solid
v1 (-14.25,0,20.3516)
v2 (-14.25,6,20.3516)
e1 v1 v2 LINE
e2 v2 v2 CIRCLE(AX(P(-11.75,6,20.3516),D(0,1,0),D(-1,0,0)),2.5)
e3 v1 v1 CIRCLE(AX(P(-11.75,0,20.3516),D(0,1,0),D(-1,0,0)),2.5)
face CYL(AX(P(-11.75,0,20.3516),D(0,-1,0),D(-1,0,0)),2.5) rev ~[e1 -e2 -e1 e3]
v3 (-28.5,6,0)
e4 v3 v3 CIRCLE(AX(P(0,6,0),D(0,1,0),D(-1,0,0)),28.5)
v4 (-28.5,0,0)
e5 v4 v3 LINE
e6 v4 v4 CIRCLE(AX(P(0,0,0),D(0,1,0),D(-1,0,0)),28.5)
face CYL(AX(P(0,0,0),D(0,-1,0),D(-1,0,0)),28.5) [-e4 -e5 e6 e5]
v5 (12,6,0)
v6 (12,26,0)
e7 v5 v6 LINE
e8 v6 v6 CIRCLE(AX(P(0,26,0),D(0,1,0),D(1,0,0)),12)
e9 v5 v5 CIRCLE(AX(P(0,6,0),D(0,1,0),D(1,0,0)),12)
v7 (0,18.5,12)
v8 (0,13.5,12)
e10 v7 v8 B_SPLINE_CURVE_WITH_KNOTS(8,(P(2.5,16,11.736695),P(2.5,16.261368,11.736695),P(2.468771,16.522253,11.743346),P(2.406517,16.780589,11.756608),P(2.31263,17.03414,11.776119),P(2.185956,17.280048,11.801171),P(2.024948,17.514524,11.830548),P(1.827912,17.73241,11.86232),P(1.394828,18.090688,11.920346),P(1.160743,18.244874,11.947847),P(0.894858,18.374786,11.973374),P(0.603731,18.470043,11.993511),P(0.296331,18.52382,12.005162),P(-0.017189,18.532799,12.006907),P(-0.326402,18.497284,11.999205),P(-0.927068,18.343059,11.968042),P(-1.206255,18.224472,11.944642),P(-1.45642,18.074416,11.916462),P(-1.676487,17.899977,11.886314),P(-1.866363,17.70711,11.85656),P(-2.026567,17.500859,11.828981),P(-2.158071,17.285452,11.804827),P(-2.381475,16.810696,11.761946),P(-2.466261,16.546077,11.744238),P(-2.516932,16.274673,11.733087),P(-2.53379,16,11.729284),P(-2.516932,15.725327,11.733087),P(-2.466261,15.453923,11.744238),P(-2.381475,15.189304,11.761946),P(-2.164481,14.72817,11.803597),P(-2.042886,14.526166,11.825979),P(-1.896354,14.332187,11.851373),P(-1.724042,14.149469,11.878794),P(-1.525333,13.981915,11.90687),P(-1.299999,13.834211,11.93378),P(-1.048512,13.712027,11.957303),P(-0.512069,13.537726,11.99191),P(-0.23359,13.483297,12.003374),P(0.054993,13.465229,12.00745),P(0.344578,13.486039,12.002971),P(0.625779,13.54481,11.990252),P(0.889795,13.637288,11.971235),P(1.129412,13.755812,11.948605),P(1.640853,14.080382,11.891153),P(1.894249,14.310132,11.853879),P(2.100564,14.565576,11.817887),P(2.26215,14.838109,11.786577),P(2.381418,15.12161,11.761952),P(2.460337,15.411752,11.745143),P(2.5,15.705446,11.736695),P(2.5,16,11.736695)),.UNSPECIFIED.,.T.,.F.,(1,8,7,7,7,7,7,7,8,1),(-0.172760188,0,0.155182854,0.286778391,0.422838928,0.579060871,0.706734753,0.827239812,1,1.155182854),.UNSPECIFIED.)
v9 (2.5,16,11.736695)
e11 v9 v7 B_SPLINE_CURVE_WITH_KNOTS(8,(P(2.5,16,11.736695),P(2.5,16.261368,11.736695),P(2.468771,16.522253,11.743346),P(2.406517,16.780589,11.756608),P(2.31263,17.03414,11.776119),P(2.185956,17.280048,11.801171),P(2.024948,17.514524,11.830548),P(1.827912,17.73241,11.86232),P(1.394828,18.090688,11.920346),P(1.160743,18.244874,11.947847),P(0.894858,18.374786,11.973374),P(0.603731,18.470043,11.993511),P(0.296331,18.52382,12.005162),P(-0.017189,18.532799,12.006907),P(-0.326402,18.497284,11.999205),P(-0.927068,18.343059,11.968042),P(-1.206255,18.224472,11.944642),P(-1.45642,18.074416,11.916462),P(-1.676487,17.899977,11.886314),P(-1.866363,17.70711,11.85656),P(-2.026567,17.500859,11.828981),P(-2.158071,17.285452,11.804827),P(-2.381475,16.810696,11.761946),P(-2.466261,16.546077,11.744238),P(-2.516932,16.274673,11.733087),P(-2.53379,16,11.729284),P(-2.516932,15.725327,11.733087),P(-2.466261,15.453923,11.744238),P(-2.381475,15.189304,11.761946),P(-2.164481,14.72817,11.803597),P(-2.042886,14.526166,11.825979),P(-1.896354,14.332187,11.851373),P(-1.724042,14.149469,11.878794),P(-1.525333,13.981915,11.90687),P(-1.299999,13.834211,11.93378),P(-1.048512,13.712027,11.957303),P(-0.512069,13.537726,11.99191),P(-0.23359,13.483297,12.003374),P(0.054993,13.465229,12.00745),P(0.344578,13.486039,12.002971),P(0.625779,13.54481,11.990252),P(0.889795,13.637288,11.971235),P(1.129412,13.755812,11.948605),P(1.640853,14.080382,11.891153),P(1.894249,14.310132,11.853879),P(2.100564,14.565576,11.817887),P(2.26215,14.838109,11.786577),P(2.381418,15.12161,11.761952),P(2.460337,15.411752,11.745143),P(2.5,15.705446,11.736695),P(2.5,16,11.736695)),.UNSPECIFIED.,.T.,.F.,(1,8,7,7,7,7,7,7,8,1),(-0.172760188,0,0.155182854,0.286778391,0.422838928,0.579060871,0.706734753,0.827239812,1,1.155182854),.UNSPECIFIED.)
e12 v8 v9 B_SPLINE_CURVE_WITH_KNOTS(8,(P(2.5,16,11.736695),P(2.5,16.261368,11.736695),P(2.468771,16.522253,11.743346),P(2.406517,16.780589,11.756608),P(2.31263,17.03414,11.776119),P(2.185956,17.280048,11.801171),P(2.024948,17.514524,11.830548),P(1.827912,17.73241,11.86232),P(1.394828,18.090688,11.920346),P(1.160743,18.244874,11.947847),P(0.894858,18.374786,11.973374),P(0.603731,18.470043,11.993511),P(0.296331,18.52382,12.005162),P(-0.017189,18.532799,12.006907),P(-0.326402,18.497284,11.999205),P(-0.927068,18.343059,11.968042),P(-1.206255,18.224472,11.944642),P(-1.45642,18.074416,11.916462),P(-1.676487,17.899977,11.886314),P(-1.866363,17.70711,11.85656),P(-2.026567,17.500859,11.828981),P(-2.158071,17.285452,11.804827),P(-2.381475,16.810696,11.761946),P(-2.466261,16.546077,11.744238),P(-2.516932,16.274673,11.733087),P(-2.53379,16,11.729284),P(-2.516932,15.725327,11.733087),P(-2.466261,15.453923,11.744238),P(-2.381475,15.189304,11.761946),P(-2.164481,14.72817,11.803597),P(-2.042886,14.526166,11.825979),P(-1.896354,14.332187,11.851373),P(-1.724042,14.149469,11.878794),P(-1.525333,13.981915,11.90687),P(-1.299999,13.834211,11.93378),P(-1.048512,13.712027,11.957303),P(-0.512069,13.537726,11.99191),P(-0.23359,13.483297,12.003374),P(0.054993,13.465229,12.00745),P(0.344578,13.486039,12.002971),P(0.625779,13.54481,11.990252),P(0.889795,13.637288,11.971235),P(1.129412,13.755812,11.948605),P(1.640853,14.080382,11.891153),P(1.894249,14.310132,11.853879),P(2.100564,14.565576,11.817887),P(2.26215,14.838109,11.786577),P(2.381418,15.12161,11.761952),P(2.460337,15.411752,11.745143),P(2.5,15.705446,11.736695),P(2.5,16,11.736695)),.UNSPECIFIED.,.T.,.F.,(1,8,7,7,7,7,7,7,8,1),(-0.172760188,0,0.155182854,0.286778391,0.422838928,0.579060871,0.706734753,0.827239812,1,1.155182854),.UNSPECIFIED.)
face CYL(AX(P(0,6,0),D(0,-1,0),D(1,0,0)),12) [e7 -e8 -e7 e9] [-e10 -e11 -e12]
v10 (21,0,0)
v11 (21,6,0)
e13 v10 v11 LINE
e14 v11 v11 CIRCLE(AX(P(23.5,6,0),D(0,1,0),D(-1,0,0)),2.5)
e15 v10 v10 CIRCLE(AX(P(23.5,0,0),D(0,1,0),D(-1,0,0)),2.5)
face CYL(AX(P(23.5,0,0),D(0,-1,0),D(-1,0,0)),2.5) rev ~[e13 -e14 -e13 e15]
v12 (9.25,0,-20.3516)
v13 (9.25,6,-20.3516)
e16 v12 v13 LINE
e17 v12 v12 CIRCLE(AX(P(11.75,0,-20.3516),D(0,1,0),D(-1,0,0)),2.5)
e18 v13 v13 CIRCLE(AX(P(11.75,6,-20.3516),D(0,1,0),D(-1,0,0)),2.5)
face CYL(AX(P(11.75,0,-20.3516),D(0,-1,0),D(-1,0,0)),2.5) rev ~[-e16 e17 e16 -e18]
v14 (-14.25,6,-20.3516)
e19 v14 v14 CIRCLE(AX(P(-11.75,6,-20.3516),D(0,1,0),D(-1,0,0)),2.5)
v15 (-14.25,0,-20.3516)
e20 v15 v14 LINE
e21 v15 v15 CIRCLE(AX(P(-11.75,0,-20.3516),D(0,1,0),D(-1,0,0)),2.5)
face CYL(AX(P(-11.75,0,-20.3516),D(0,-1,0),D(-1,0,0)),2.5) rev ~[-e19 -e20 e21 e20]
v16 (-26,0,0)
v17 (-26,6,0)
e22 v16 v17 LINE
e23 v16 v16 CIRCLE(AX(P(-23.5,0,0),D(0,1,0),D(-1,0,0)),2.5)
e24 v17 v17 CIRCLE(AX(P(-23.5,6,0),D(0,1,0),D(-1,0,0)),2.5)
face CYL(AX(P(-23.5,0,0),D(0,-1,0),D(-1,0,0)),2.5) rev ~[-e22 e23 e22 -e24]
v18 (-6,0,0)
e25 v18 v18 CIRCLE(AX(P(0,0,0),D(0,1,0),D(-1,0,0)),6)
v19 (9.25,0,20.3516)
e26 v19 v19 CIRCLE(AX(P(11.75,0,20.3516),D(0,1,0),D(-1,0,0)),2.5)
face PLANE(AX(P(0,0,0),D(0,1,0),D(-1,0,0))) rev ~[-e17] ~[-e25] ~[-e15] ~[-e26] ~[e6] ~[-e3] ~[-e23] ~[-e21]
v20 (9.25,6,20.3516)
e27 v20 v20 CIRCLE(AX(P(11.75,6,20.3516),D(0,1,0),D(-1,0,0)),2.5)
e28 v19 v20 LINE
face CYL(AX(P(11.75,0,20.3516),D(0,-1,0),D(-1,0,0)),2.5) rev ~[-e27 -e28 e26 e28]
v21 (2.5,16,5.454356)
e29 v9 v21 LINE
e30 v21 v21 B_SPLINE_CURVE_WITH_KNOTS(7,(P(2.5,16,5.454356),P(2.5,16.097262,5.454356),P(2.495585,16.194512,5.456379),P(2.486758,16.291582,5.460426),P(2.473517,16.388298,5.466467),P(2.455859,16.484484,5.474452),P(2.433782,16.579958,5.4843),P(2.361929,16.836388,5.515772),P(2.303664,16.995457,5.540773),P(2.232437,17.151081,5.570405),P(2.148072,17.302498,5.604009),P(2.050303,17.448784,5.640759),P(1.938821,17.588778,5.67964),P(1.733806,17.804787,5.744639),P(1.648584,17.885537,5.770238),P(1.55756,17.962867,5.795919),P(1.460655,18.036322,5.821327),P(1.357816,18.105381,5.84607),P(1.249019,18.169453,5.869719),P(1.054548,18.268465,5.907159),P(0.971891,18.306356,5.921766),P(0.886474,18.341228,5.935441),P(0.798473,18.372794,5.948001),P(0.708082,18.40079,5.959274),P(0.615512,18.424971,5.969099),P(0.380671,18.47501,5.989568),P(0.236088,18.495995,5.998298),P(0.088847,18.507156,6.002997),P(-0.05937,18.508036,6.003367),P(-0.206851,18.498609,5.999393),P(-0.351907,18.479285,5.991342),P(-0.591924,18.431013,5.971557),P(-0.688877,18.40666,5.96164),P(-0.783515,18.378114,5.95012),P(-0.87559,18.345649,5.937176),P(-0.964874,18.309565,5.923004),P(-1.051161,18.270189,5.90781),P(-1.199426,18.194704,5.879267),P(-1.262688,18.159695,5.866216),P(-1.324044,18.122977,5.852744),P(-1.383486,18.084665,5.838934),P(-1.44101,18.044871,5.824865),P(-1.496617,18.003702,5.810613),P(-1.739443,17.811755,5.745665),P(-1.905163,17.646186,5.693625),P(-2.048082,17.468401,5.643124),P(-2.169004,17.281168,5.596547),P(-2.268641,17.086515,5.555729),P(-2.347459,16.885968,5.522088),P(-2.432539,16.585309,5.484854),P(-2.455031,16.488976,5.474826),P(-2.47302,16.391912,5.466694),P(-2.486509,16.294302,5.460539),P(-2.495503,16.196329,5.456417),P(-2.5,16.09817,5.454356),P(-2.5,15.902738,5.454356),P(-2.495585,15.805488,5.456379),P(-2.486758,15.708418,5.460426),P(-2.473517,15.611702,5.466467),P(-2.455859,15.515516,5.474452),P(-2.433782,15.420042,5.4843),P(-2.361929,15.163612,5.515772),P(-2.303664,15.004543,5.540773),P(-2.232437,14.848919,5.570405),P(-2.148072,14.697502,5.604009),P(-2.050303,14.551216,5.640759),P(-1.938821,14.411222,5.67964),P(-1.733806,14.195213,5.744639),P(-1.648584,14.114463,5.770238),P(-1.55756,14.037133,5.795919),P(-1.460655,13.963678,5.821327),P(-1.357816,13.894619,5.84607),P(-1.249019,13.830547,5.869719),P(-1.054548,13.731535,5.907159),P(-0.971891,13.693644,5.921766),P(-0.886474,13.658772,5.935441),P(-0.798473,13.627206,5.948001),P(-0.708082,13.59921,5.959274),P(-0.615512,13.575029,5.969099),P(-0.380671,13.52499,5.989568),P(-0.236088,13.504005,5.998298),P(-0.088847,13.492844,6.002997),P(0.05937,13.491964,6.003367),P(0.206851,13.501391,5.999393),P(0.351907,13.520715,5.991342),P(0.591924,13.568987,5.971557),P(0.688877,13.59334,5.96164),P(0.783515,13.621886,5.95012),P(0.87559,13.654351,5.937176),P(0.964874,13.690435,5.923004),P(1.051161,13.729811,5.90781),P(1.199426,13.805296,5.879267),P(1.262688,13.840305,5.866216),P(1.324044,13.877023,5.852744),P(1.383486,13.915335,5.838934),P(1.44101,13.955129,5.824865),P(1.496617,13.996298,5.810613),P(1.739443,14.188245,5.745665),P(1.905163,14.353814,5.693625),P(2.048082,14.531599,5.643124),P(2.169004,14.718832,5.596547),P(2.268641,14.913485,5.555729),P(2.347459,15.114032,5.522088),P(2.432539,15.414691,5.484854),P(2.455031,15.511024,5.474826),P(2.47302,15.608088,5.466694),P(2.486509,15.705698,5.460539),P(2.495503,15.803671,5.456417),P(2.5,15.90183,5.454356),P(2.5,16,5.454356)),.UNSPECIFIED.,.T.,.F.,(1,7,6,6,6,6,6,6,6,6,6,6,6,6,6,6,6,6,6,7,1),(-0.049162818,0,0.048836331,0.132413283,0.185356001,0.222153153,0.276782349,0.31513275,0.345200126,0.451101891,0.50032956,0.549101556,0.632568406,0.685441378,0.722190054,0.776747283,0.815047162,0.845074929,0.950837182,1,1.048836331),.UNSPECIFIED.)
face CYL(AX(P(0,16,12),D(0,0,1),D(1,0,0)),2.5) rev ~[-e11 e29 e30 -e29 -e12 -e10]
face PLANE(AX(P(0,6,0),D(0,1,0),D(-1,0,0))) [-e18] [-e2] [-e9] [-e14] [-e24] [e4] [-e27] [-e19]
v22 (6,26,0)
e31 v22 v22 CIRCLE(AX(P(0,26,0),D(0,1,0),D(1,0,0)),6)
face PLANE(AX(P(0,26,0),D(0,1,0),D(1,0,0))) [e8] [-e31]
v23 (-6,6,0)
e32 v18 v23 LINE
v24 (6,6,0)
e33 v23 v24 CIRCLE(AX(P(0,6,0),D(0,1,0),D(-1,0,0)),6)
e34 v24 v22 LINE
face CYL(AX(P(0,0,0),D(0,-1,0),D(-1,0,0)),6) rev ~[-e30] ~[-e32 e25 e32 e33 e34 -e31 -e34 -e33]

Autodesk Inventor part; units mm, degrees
ref_plane "YZ Plane" through (0, 0, 0) normal (1, 0, 0) x (0, 1, 0)
ref_plane "XZ Plane" through (0, 0, 0) normal (0, 1, 0) x (-1, 0, 0)
sketch "スケッチ1" plane through (0, 0, 0) normal (0, 1, 0) x (-1, 0, 0)
  circle A0 centre (0, 0) radius 28.5
  line L0 (-28.5, 0) -> (28.5, 0) construction
  circle A1 centre (23.5, 0) radius 2.5
  circle A2 centre (11.75, 20.3516) radius 2.5
  circle A3 centre (-11.75, 20.3516) radius 2.5
  circle A4 centre (-23.5, 0) radius 2.5
  circle A5 centre (-11.75, -20.3516) radius 2.5
  circle A6 centre (11.75, -20.3516) radius 2.5
  circle A7 centre (0, 0) radius 6
  dimension "d0" = 57
  dimension "d1" = 5
  dimension "d2" = 23.5
  dimension "d6" = 360
  dimension "d10" = 12
extrude "押し出し1" add sketch "スケッチ1" along normal blind 6
sketch "スケッチ2" plane through (0, 6, 0) normal (0, 1, 0) x (1, 0, 0)
  circle A0 centre (0, 0) radius 12
  circle A1 centre (0, 0) radius 6 projected
  dimension "d11" = 24
extrude "押し出し2" add sketch "スケッチ2" along normal blind 20
ref_plane "作業平面1" through (0, 6, 12) normal (0, 0, 1) x (1, 0, 0)
sketch "スケッチ3" plane through (0, 6, 12) normal (0, 0, 1) x (1, 0, 0)
  line L0 (12, 20) -> (-12, 20) projected
  line L1 (12, 20) -> (-12, 20) projected
  line L2 (-12, 0) -> (12, 0) projected
  circle A0 centre (0, 10) radius 2.5
  line L3 (0, 0) -> (0, 20) construction
  point P0 (0, -6)
  dimension "d14" = 20
  dimension "d15" = 5
  dimension "d16" = 10
extrude "押し出し3" cut sketch "スケッチ3" against normal up to surface
thread "ねじ1" size "M5x0.8" class "6H" standard "ANSI Metric M Profile" length 55
equation "\"d16\" = 0.5 * d14"
properties part number "frange" material "ステンレス鋼"
